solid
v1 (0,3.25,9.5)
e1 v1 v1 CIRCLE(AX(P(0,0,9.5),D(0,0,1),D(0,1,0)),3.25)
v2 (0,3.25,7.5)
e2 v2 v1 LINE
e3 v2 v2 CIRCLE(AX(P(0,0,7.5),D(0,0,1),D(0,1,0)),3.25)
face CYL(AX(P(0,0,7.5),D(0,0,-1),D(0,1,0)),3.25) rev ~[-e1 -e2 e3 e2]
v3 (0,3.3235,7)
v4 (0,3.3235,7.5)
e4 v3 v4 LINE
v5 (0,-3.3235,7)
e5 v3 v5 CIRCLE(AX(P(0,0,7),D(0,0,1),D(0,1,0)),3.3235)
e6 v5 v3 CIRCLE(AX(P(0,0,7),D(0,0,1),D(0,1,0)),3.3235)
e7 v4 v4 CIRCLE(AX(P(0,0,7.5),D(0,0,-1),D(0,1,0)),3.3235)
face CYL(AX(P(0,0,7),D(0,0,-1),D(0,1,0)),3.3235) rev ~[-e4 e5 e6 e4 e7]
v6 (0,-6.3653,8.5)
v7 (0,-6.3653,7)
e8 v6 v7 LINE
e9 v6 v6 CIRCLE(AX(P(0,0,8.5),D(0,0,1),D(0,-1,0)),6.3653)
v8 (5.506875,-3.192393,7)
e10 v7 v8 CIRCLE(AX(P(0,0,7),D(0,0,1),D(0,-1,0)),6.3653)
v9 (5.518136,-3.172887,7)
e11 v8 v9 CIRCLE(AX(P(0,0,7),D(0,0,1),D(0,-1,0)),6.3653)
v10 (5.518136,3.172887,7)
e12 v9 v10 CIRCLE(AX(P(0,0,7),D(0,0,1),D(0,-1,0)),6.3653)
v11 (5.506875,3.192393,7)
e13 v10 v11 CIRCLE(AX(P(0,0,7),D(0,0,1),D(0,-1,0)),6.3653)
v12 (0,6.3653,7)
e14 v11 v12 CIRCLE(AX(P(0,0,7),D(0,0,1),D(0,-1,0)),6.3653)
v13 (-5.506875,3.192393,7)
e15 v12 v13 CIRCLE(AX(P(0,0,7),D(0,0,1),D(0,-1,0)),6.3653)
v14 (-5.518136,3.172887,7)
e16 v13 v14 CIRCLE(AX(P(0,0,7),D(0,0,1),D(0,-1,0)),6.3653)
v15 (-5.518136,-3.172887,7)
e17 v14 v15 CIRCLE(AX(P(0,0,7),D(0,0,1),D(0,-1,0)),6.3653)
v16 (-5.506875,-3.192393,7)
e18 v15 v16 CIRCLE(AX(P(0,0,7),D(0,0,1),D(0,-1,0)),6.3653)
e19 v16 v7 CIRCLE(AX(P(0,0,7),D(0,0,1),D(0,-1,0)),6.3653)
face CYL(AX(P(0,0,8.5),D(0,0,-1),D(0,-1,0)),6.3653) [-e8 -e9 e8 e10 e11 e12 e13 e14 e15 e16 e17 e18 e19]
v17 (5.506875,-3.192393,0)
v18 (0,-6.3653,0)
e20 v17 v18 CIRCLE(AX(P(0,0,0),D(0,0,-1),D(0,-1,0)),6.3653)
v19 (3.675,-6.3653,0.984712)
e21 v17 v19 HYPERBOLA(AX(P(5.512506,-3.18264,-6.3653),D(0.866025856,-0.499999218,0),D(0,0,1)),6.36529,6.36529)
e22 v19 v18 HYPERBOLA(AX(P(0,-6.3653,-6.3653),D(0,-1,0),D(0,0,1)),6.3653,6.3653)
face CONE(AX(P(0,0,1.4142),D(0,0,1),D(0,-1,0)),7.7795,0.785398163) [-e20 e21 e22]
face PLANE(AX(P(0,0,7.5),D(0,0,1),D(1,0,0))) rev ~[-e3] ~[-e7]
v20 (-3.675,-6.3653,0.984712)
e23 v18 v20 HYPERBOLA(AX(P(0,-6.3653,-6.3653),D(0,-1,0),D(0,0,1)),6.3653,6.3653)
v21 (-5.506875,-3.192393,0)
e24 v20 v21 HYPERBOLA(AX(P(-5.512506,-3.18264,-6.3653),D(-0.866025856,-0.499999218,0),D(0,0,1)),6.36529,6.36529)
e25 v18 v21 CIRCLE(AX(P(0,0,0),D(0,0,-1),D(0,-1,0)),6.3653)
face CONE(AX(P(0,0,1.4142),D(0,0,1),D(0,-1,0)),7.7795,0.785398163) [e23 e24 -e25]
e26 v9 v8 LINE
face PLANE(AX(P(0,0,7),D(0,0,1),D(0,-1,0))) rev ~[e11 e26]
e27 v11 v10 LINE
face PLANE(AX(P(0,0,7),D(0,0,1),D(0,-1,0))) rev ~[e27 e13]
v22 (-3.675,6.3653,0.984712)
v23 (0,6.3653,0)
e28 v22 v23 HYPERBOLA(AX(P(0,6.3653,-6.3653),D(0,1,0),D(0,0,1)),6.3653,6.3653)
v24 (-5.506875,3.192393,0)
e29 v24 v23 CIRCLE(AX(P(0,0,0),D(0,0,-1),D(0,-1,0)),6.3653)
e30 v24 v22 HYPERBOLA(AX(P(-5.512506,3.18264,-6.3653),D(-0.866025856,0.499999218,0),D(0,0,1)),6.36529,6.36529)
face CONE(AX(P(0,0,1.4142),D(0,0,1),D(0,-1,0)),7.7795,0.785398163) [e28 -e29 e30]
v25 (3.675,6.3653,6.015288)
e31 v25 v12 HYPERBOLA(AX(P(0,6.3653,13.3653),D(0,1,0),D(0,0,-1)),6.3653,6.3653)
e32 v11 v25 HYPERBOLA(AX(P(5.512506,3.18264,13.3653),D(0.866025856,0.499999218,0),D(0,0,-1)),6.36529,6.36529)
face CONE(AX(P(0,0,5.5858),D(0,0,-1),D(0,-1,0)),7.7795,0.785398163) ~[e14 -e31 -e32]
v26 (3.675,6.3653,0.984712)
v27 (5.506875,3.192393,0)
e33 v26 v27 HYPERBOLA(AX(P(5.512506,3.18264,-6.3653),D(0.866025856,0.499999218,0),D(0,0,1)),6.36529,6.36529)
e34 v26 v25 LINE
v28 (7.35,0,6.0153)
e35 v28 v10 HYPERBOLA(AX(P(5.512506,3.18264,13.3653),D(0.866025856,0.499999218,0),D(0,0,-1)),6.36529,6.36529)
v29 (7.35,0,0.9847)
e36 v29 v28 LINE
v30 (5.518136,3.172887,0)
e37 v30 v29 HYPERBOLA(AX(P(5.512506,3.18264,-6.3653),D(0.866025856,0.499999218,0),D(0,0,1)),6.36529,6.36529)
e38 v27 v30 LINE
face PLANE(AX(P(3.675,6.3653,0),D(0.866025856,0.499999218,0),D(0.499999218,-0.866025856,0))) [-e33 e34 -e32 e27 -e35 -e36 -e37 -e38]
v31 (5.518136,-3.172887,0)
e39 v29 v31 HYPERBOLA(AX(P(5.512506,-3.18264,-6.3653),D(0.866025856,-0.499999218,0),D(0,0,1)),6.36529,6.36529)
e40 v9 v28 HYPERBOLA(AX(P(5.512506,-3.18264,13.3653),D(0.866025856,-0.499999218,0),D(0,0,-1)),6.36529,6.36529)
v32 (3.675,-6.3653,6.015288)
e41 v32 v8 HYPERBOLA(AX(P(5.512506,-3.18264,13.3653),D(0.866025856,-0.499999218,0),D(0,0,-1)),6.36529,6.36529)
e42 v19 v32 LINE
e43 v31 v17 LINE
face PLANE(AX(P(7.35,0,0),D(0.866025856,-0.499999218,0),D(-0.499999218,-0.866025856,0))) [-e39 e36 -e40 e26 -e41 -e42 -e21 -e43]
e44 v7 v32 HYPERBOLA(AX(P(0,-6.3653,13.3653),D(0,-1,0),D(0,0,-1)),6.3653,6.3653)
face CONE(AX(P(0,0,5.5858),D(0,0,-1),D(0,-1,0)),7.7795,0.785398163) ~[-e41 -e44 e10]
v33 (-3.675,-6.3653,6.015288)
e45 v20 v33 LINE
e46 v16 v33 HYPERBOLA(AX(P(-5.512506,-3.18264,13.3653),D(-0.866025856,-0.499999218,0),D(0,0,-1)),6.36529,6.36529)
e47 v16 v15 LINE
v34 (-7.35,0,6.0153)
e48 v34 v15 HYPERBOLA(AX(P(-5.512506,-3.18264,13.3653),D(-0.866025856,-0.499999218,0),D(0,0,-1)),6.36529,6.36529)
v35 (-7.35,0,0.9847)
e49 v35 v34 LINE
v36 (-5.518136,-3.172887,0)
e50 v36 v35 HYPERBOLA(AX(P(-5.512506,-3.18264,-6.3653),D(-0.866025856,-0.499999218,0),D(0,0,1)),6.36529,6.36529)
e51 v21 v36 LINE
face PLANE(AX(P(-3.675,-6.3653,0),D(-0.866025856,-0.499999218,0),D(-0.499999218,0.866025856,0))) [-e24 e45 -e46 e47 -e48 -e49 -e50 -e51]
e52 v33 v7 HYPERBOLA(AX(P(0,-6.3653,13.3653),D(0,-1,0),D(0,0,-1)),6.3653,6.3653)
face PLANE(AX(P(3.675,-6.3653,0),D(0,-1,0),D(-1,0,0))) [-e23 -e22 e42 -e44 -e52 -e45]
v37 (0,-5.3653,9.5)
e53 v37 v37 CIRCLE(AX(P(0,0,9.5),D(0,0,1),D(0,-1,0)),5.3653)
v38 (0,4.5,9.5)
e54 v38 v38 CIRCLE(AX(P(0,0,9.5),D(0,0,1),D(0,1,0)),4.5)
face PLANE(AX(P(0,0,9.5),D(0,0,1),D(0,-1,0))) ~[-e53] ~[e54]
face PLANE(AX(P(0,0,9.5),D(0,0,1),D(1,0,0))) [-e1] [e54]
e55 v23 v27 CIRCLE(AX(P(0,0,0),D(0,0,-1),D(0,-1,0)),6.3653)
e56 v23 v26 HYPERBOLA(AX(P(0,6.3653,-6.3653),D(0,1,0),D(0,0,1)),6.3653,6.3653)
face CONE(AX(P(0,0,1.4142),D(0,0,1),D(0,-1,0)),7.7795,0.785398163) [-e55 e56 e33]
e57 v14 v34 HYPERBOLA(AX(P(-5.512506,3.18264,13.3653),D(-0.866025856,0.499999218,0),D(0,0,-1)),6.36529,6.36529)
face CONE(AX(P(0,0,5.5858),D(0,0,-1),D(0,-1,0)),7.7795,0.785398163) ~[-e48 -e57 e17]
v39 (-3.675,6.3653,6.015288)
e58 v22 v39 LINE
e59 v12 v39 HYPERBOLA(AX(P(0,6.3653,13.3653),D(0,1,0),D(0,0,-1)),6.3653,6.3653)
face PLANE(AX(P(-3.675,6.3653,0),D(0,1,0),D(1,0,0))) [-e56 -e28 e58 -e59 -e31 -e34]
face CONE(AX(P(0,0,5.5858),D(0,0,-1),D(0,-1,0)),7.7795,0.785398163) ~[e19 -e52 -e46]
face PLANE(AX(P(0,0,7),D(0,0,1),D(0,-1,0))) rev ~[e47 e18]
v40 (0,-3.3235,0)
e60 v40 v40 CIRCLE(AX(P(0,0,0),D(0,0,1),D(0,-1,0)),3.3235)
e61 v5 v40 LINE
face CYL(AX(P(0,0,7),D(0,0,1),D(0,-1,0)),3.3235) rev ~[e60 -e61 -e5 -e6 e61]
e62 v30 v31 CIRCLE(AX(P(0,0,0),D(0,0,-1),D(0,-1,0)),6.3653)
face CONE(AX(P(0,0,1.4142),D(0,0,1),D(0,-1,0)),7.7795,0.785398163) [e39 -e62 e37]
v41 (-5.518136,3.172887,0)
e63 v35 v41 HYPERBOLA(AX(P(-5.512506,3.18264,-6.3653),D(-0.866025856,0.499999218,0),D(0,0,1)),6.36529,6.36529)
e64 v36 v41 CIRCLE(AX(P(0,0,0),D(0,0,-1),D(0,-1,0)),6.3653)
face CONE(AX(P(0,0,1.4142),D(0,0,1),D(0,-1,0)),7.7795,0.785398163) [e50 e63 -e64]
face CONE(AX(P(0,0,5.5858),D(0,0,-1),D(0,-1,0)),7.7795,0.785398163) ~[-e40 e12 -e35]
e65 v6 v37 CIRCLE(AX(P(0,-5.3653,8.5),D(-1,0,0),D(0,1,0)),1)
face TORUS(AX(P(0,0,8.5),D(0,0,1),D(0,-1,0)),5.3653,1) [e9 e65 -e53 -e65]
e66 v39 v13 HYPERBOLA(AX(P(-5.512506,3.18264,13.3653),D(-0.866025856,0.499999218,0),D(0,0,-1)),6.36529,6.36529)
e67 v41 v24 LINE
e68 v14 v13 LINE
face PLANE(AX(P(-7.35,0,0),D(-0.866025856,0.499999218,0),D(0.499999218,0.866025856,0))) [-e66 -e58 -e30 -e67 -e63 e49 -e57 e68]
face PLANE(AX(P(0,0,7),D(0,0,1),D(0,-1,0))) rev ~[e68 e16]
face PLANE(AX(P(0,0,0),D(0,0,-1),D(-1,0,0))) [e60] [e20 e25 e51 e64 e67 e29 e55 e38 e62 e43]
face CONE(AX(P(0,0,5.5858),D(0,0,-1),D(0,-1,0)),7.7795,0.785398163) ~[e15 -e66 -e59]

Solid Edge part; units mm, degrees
sketch "Sketch1" plane through (0, 0, 0) normal (0, 0, 1) x (1, 0, 0)
  line L0 (-3.675, 6.3653) -> (3.675, 6.3653)
  line L1 (3.675, 6.3653) -> (7.35, 0)
  line L2 (7.35, 0) -> (3.675, -6.3653)
  line L3 (3.675, -6.3653) -> (-3.675, -6.3653)
  line L4 (-3.675, -6.3653) -> (-7.35, 0)
  line L5 (-7.35, 0) -> (-3.675, 6.3653)
extrude "Protrusion1" add sketch "Sketch1" along normal blind 7
sketch "Sketch2" plane through (0, -5.5125, 6.3) normal (-1, 0, 0) x (0, 1, 0)
  line L0 (-2.267, 4.8858) -> (0.5614, 7.7142)
  line L1 (-2.267, 4.8858) -> (-2.267, 0.7142)
  line L2 (-2.267, 0.7142) -> (0.5614, -2.1142)
revolve "RevolvedCutout1" cut sketch "Sketch2" angle 360 about axis through (0, 0, 0.5943) along (0, 0, -1) material side at (0, -6.4007, -0.0354)
sketch "Sketch3" plane through (0, 0, 0) normal (1, 0, 0) x (0, 1, 0)
  line L0 (0, 9.5) -> (-5.3653, 9.5)
  arc A0 (-6.3653, 8.5) -> (-5.3653, 9.5) centre (-5.3653, 8.5) cw
  line L1 (-6.3653, 8.5) -> (-6.3653, 7)
  line L2 (-6.3653, 7) -> (0, 7)
  line L3 (0, 7) -> (0, 9.5)
  dimension "D1" = 9.5
revolve "RevolvedProtrusion1" add sketch "Sketch3" angle 360 about axis through (0, 0, -57) along (0, 0, 1)
hole "Hole_1" at (0, 0, 7) direction (0, 0, 1) diameter 6.647 end up to next both ways yes
sketch "Sketch4" plane through (0, 0, 9.5) normal (0, 0, 1) x (0, 1, 0)
  circle A0 centre (0, 0) radius 4.5
extrude "ExtrudedCutout_2" cut sketch "Sketch4" against normal blind 2
sketch "Sketch5" plane through (0, 0, 7.5) normal (0, 0, 1) x (0, 1, 0)
  circle A0 centre (0, 0) radius 4.5
  circle A1 centre (0, 0) radius 3.25
  dimension "D1" = 6.5
extrude "Protrusion2" add sketch "Sketch5" along normal up to vertex (2 mm away)
